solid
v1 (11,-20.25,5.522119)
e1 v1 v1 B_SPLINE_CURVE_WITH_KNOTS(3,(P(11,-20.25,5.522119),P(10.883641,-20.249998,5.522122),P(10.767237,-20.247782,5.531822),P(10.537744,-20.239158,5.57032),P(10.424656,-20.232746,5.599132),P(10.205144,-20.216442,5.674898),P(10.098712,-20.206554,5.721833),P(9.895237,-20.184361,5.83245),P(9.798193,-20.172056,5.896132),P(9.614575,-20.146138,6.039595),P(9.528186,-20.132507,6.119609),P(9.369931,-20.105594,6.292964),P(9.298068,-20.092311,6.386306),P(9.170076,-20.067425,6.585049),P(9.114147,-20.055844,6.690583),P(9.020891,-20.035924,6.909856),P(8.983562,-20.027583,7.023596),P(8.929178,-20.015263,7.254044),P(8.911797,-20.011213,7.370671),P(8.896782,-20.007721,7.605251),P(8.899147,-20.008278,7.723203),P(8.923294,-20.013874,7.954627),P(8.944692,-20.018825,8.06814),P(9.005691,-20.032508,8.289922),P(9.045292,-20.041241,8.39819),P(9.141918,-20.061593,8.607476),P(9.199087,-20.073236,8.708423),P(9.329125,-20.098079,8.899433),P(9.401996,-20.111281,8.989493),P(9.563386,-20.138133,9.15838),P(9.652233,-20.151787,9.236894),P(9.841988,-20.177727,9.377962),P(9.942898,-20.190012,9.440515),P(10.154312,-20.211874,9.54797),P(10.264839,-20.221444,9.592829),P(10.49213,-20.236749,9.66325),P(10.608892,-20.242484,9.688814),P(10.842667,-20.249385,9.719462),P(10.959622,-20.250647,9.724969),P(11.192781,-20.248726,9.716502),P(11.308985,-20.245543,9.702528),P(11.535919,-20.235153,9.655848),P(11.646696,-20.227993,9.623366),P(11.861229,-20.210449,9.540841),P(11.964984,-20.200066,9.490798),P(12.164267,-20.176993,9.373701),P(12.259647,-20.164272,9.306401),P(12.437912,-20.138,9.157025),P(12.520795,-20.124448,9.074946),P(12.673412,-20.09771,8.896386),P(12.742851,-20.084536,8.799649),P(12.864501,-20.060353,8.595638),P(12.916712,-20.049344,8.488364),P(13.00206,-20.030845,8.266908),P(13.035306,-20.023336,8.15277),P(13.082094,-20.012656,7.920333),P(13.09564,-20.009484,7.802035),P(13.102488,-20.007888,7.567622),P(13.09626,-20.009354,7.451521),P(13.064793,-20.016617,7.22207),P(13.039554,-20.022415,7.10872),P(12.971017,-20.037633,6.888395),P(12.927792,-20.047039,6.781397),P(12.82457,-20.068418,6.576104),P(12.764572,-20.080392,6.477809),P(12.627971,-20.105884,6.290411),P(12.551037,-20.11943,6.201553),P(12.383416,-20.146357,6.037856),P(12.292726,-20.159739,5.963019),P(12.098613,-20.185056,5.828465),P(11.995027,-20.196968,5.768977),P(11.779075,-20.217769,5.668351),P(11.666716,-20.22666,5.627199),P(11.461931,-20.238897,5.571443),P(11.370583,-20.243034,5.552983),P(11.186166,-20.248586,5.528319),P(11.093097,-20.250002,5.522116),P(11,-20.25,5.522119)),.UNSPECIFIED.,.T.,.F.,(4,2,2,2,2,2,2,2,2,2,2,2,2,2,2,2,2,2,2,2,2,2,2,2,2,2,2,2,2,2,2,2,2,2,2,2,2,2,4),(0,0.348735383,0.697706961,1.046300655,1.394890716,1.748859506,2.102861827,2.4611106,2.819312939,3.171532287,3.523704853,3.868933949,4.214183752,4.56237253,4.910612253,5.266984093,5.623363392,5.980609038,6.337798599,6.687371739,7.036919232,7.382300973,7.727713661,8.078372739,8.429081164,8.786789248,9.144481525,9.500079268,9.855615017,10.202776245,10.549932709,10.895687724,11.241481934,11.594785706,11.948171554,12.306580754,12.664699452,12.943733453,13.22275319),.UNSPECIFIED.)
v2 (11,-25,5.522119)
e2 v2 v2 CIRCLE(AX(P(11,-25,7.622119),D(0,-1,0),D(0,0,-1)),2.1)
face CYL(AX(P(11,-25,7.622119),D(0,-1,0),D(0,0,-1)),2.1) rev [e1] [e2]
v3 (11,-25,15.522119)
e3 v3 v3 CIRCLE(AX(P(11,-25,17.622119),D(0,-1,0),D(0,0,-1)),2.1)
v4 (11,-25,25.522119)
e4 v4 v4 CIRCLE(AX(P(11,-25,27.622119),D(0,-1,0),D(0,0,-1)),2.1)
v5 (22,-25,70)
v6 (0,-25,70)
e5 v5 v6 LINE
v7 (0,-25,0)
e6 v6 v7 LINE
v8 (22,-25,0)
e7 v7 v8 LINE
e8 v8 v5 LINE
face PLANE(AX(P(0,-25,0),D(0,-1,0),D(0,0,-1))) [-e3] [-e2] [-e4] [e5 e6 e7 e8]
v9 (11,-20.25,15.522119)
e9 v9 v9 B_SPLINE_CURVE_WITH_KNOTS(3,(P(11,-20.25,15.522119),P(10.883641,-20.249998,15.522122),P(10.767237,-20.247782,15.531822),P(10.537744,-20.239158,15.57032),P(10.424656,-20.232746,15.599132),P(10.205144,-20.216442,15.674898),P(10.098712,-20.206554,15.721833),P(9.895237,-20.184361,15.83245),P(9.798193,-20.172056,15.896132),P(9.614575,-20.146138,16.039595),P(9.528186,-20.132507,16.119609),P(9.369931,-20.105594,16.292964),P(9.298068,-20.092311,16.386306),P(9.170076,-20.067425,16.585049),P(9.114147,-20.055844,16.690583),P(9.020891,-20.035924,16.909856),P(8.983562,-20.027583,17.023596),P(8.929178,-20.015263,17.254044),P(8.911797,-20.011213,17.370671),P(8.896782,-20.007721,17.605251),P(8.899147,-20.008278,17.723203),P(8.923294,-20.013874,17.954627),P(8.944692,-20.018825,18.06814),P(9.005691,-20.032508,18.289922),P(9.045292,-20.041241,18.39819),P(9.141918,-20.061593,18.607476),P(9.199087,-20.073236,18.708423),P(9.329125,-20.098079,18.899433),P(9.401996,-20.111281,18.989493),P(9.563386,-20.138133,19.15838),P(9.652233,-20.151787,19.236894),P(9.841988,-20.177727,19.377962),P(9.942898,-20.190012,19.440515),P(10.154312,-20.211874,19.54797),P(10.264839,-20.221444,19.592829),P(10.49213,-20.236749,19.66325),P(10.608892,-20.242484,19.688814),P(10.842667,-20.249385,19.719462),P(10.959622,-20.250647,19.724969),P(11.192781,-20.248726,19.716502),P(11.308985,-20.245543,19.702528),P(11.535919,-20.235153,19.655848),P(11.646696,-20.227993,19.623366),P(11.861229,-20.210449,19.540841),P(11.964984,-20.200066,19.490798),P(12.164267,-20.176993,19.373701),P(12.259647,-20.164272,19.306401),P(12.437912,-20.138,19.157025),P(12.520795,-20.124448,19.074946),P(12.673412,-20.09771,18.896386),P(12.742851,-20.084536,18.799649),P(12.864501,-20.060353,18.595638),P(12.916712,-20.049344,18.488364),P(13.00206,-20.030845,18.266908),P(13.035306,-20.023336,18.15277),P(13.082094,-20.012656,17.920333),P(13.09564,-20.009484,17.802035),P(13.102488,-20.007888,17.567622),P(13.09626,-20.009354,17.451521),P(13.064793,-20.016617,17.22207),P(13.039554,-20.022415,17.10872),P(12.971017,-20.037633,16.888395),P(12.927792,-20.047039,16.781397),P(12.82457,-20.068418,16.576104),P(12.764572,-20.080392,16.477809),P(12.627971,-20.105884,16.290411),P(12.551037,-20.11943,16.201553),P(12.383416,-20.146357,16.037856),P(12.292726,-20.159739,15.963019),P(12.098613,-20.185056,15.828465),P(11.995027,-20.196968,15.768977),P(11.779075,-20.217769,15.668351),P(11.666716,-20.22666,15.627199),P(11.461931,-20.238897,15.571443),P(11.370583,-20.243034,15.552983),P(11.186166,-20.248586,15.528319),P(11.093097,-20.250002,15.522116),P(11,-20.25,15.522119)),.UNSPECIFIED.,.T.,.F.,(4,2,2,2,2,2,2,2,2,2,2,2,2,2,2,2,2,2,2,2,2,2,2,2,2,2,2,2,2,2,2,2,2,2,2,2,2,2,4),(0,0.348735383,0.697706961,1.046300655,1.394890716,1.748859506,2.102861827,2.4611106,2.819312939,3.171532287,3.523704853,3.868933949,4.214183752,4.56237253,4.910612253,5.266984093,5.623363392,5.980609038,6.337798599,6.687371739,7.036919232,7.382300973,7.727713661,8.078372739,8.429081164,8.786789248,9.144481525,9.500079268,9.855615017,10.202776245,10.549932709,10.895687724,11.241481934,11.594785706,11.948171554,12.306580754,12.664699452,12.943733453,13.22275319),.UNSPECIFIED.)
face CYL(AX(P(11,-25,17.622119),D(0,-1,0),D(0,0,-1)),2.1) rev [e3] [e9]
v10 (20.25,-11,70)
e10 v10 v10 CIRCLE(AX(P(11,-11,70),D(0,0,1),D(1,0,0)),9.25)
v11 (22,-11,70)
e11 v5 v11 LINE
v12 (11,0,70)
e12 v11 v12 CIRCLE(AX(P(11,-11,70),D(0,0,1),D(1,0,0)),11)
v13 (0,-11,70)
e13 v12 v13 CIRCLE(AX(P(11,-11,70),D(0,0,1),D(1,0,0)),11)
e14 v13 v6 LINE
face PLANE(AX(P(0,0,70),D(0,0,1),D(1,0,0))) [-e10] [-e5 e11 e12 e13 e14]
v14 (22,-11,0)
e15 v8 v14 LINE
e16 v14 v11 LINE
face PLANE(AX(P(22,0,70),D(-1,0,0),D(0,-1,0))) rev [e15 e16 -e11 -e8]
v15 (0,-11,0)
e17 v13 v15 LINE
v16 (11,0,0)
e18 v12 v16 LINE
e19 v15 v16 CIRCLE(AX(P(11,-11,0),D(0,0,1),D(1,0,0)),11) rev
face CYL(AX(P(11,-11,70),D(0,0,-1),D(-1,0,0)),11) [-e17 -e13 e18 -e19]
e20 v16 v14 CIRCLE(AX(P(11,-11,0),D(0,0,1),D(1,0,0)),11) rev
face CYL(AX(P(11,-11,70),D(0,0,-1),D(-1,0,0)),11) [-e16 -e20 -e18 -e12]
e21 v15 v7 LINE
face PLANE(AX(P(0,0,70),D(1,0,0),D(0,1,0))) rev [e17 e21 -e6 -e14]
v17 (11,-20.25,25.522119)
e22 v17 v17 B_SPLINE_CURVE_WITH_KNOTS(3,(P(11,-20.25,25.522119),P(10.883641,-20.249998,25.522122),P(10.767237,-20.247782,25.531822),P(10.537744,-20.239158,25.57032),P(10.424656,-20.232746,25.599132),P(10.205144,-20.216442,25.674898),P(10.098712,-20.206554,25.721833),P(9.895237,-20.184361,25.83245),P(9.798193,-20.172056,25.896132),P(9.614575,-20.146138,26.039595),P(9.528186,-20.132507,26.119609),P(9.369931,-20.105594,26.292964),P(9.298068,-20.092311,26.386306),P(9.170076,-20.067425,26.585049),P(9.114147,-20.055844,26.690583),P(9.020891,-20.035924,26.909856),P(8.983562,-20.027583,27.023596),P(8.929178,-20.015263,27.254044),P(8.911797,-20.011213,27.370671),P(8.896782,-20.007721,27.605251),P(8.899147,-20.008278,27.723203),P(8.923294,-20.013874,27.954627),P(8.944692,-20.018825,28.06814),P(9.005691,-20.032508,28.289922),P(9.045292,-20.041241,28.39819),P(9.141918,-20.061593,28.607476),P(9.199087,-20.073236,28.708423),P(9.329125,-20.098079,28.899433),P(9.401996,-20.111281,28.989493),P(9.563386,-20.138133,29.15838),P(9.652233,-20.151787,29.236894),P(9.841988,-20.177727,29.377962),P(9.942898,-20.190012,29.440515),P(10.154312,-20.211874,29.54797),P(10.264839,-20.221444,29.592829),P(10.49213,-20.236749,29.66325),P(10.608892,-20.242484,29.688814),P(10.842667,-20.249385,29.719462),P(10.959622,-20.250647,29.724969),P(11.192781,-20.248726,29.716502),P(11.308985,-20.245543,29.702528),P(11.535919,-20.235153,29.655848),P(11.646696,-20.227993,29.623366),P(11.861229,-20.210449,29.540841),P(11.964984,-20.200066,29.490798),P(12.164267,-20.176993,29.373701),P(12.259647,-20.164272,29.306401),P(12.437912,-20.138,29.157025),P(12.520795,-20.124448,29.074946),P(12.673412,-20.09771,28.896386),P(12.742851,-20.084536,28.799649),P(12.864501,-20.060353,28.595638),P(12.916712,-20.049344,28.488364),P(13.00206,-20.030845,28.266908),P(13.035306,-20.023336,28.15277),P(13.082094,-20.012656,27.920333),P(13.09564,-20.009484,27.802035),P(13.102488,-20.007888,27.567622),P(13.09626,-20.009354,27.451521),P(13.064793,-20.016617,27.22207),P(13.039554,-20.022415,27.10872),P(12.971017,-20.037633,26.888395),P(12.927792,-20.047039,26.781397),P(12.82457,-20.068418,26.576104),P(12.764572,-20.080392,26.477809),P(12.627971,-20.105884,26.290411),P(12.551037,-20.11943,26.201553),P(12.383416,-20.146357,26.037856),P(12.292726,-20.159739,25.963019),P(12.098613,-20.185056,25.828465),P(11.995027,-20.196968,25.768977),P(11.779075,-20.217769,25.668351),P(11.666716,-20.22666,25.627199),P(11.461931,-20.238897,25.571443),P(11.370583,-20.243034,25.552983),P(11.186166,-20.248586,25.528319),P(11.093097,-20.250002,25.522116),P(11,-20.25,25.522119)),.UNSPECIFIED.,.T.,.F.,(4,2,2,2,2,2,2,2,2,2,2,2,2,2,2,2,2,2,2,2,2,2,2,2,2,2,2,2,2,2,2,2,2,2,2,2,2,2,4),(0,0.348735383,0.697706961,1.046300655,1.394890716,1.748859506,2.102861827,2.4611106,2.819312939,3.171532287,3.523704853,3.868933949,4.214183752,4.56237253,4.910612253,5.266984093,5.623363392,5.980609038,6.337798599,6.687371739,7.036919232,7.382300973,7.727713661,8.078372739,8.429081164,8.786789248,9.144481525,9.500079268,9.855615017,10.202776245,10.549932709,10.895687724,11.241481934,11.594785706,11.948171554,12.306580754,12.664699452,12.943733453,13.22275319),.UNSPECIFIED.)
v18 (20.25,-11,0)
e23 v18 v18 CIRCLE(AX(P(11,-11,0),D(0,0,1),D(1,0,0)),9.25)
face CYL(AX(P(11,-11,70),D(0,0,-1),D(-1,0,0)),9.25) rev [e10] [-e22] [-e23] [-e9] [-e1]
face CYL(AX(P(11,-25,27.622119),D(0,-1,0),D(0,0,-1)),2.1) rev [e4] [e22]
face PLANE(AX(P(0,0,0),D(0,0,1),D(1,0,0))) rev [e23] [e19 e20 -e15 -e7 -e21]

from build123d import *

# Parameters (mm, degrees)
CROQUIS1_W                = 22
CROQUIS1_H                = 22
CROQUIS1_R                = 9.25
SALIENTE_EXTRUIR1_DEPTH   = 70
REDONDEO1_R               = 11
CROQUIS6_W                = 22
CROQUIS6_H                = 70
SALIENTE_EXTRUIR2_DEPTH   = 3
TALADRO_ROSCADO_M51_D     = 4.2
TALADRO_ROSCADO_M51_DEPTH = 14
TALADRO_ROSCADO_M51_TIP   = 1.2618073


with BuildPart() as part:
    # Croquis1 → Saliente-Extruir1 (new body)
    with BuildSketch(Plane.XY):
        with Locations((11, -11)):
            Rectangle(CROQUIS1_W, CROQUIS1_H)
        with Locations((11, -11)):
            Circle(CROQUIS1_R, mode=Mode.SUBTRACT)
    extrude(amount=SALIENTE_EXTRUIR1_DEPTH)

    # Redondeo1
    redondeo1_edges = [part.edges().sort_by_distance(p)[0] for p in [
        (22, 0, 35),
        (0, 0, 35),
    ]]
    fillet(redondeo1_edges, radius=REDONDEO1_R - 0.0001)  # a hair under: the kernel refuses the full size

    # Croquis6 → Saliente-Extruir2 (add)
    with BuildSketch(Plane.XZ.offset(22)):
        with Locations((11, 35)):
            Rectangle(CROQUIS6_W, CROQUIS6_H)
    extrude(amount=SALIENTE_EXTRUIR2_DEPTH)

    # Taladro roscado M51
    with Locations(Plane(origin=(0, -25, 0), x_dir=(-1, 0, 0), z_dir=(0, -1, 0))):
        with Locations((-11, -7.622118599), (-11, -17.622118599), (-11, -27.622118599)):
            Hole(TALADRO_ROSCADO_M51_D / 2, depth=TALADRO_ROSCADO_M51_DEPTH)
            with Locations((0, 0, -(TALADRO_ROSCADO_M51_DEPTH + TALADRO_ROSCADO_M51_TIP / 2))):  # 118° drill point
                Cone(0, TALADRO_ROSCADO_M51_D / 2, TALADRO_ROSCADO_M51_TIP, mode=Mode.SUBTRACT)


solid = part.part
